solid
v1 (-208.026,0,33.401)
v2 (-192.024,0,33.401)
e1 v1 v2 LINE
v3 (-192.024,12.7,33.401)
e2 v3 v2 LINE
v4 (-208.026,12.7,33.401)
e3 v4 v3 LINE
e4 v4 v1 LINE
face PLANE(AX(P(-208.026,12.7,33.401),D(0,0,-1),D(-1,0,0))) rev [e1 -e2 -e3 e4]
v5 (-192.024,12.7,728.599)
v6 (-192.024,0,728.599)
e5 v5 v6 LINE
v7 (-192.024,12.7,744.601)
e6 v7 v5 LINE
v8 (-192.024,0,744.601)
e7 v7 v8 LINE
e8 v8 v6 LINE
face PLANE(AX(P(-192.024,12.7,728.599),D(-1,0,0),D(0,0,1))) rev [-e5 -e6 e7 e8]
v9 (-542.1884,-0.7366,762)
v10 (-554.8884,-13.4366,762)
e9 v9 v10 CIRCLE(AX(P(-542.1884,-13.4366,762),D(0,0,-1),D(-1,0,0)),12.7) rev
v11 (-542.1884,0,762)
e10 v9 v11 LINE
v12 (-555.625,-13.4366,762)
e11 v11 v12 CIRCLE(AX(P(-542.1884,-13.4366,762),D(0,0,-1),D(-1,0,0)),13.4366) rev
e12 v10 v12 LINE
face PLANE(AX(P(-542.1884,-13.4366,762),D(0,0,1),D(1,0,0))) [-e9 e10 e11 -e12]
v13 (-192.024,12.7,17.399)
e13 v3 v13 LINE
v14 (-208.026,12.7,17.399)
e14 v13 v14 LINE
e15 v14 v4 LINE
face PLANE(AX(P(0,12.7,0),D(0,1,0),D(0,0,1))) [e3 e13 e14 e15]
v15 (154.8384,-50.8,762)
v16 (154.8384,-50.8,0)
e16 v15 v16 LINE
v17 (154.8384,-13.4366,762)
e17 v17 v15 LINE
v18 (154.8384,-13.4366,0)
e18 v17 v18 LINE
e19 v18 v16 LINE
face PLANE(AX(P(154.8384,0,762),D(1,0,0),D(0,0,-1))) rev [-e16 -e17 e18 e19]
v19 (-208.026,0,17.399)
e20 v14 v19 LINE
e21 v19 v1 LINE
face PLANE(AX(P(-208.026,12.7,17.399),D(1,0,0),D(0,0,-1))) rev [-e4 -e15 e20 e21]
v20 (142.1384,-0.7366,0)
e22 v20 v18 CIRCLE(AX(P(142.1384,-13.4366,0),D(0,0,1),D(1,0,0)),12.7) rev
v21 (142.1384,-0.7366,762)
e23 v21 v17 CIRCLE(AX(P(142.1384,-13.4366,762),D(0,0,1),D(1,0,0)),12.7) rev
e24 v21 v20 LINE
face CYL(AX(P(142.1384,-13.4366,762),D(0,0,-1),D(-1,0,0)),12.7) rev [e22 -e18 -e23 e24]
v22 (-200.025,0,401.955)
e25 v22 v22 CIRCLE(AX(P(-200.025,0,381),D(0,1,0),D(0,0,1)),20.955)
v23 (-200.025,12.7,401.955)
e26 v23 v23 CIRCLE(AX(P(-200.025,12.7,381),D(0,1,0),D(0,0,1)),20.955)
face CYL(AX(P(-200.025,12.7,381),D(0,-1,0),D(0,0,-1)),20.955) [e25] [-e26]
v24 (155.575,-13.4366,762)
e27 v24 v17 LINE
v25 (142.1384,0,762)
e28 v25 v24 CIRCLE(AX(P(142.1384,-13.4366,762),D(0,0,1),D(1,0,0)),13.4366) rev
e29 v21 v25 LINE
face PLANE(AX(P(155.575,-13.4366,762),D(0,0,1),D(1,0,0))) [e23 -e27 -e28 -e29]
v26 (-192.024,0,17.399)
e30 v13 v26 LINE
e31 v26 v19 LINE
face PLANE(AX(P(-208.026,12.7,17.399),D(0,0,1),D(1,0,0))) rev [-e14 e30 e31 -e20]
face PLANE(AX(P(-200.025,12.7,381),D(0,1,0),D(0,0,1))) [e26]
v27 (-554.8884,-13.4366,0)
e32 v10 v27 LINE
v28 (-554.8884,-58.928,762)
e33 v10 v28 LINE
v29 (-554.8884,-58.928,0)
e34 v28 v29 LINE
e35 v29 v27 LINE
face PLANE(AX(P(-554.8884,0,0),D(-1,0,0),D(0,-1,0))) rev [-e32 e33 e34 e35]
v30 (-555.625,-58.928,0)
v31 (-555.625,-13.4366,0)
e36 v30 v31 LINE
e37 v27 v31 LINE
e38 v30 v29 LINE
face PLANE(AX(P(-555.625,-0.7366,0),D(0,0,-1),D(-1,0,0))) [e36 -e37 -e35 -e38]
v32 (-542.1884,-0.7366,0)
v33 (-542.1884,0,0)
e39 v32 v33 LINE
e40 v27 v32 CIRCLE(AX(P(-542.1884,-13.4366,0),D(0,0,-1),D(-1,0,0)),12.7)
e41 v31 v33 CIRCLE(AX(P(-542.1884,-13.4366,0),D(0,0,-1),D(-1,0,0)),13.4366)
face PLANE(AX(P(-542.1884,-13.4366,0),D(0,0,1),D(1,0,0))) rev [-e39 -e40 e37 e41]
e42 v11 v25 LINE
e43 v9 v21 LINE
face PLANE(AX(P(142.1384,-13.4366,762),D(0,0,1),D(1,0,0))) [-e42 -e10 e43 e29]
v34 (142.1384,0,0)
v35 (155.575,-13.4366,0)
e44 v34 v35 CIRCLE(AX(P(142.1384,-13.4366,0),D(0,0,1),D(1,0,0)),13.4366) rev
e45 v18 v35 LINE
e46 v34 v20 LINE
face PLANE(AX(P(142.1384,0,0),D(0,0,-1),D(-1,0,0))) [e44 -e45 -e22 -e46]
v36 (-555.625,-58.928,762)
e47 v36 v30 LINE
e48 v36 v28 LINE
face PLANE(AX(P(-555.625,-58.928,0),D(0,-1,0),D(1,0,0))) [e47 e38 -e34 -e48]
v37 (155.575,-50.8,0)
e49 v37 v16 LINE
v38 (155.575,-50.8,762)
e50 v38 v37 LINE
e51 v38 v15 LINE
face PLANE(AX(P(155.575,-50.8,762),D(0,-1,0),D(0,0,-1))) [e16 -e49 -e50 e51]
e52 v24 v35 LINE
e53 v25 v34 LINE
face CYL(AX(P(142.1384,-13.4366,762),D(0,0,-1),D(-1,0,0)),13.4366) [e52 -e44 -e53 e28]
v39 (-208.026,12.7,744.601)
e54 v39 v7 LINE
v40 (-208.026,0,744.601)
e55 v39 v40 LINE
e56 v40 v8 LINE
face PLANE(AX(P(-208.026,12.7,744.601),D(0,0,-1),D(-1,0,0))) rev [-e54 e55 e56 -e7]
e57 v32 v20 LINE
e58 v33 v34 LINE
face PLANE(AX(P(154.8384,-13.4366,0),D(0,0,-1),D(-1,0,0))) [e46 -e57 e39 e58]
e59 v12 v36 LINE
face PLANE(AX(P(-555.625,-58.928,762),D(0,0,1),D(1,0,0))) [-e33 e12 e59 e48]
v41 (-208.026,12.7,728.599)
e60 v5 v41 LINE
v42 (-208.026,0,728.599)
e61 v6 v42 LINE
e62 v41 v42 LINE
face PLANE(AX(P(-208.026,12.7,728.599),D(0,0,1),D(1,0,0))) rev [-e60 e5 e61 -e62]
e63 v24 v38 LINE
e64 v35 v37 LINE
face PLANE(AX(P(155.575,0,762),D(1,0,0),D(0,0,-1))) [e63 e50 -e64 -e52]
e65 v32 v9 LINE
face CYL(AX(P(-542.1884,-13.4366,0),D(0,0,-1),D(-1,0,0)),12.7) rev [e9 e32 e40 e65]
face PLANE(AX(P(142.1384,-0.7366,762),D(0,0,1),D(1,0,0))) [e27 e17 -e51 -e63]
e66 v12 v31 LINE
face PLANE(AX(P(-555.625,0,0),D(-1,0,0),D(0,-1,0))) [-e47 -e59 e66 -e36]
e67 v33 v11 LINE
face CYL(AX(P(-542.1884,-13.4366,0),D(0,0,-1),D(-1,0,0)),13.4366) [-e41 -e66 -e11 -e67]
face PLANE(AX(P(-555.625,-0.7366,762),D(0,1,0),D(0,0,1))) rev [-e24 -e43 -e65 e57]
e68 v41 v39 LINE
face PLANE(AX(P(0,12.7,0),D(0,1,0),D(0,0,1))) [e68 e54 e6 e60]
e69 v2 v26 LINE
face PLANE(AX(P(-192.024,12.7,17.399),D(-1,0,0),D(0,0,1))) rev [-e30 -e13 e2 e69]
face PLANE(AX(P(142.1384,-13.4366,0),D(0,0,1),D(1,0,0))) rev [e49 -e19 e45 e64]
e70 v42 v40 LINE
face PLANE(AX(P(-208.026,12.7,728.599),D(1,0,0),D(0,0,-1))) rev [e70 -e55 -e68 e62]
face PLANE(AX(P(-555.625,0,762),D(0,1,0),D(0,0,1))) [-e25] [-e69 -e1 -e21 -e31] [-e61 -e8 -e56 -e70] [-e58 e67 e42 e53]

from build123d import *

# Parameters (mm, degrees)
BASE_FLANGE1_DEPTH           = 762
EDGE_FLANGE1_STRIP_W         = 28.3464
EDGE_FLANGE1_STRIP_H         = 0.7366
EDGE_FLANGE1_STRIP_CUT_DEPTH = 762
EDGE_FLANGE1_DEPTH           = 762
SKETCH9_R                    = 20.955
SKETCH9_W                    = 16.002
SKETCH9_H                    = 16.002
BOSS_EXTRUDE2_DEPTH          = 12.7


# Sheet-metal steps are written as plain solids
with BuildPart() as part:
    # Sketch3 → Base-Flange1 (new body)
    with BuildSketch(Plane.XY):
        with BuildLine():
            Line((-555.625, 0), (142.1384, 0))
            ThreePointArc((142.1384, 0), (151.639510976, -3.935489024), (155.575, -13.4366))
            Line((155.575, -13.4366), (155.575, -50.8))
            Line((155.575, -50.8), (154.8384, -50.8))
            Line((154.8384, -50.8), (154.8384, -13.4366))
            ThreePointArc((154.8384, -13.4366), (151.118656121, -4.456343879), (142.1384, -0.7366))
            Line((142.1384, -0.7366), (-555.625, -0.7366))
            Line((-555.625, -0.7366), (-555.625, 0))
        make_face()
    extrude(amount=BASE_FLANGE1_DEPTH)

    # Edge-Flange1 strip (across the edge) → Edge-Flange1 strip cut (cut)
    with BuildSketch(Plane(origin=(-555.625, -0.7366, 762), x_dir=(1, 0, 0), z_dir=(0, 0, -1))):
        with Locations((-0.7366, -0.3683)):
            Rectangle(EDGE_FLANGE1_STRIP_W, EDGE_FLANGE1_STRIP_H)
    extrude(amount=EDGE_FLANGE1_STRIP_CUT_DEPTH, mode=Mode.SUBTRACT)

    # Edge-Flange1 section (across the edge) → Edge-Flange1 (add)
    with BuildSketch(Plane(origin=(-555.625, -0.7366, 762), x_dir=(1, 0, 0), z_dir=(0, 0, -1))):
        with BuildLine():
            Line((0, 12.7), (0, 58.1914))
            Line((0, 58.1914), (0.7366, 58.1914))
            Line((0.7366, 58.1914), (0.7366, 12.7))
            ThreePointArc((0.7366, 12.7), (4.456343879, 3.719743879), (13.4366, 0))
            Line((13.4366, 0), (13.4366, -0.7366))
            ThreePointArc((13.4366, -0.7366), (3.935489024, 3.198889024), (0, 12.7))
        make_face()
    extrude(amount=EDGE_FLANGE1_DEPTH)

    # Sketch9 → Boss-Extrude2 (add)
    with BuildSketch(Plane(origin=(0, 0, 0), x_dir=(1, 0, 0), z_dir=(0, 1, 0))):
        with Locations(Location((-200.025, -381, 0), (0, 0, 270))):
            Circle(SKETCH9_R)
        with Locations((-200.025, -736.6)):
            Rectangle(SKETCH9_W, SKETCH9_H)
        with Locations((-200.025, -25.4)):
            Rectangle(SKETCH9_W, SKETCH9_H)
    extrude(amount=BOSS_EXTRUDE2_DEPTH)


solid = part.part
